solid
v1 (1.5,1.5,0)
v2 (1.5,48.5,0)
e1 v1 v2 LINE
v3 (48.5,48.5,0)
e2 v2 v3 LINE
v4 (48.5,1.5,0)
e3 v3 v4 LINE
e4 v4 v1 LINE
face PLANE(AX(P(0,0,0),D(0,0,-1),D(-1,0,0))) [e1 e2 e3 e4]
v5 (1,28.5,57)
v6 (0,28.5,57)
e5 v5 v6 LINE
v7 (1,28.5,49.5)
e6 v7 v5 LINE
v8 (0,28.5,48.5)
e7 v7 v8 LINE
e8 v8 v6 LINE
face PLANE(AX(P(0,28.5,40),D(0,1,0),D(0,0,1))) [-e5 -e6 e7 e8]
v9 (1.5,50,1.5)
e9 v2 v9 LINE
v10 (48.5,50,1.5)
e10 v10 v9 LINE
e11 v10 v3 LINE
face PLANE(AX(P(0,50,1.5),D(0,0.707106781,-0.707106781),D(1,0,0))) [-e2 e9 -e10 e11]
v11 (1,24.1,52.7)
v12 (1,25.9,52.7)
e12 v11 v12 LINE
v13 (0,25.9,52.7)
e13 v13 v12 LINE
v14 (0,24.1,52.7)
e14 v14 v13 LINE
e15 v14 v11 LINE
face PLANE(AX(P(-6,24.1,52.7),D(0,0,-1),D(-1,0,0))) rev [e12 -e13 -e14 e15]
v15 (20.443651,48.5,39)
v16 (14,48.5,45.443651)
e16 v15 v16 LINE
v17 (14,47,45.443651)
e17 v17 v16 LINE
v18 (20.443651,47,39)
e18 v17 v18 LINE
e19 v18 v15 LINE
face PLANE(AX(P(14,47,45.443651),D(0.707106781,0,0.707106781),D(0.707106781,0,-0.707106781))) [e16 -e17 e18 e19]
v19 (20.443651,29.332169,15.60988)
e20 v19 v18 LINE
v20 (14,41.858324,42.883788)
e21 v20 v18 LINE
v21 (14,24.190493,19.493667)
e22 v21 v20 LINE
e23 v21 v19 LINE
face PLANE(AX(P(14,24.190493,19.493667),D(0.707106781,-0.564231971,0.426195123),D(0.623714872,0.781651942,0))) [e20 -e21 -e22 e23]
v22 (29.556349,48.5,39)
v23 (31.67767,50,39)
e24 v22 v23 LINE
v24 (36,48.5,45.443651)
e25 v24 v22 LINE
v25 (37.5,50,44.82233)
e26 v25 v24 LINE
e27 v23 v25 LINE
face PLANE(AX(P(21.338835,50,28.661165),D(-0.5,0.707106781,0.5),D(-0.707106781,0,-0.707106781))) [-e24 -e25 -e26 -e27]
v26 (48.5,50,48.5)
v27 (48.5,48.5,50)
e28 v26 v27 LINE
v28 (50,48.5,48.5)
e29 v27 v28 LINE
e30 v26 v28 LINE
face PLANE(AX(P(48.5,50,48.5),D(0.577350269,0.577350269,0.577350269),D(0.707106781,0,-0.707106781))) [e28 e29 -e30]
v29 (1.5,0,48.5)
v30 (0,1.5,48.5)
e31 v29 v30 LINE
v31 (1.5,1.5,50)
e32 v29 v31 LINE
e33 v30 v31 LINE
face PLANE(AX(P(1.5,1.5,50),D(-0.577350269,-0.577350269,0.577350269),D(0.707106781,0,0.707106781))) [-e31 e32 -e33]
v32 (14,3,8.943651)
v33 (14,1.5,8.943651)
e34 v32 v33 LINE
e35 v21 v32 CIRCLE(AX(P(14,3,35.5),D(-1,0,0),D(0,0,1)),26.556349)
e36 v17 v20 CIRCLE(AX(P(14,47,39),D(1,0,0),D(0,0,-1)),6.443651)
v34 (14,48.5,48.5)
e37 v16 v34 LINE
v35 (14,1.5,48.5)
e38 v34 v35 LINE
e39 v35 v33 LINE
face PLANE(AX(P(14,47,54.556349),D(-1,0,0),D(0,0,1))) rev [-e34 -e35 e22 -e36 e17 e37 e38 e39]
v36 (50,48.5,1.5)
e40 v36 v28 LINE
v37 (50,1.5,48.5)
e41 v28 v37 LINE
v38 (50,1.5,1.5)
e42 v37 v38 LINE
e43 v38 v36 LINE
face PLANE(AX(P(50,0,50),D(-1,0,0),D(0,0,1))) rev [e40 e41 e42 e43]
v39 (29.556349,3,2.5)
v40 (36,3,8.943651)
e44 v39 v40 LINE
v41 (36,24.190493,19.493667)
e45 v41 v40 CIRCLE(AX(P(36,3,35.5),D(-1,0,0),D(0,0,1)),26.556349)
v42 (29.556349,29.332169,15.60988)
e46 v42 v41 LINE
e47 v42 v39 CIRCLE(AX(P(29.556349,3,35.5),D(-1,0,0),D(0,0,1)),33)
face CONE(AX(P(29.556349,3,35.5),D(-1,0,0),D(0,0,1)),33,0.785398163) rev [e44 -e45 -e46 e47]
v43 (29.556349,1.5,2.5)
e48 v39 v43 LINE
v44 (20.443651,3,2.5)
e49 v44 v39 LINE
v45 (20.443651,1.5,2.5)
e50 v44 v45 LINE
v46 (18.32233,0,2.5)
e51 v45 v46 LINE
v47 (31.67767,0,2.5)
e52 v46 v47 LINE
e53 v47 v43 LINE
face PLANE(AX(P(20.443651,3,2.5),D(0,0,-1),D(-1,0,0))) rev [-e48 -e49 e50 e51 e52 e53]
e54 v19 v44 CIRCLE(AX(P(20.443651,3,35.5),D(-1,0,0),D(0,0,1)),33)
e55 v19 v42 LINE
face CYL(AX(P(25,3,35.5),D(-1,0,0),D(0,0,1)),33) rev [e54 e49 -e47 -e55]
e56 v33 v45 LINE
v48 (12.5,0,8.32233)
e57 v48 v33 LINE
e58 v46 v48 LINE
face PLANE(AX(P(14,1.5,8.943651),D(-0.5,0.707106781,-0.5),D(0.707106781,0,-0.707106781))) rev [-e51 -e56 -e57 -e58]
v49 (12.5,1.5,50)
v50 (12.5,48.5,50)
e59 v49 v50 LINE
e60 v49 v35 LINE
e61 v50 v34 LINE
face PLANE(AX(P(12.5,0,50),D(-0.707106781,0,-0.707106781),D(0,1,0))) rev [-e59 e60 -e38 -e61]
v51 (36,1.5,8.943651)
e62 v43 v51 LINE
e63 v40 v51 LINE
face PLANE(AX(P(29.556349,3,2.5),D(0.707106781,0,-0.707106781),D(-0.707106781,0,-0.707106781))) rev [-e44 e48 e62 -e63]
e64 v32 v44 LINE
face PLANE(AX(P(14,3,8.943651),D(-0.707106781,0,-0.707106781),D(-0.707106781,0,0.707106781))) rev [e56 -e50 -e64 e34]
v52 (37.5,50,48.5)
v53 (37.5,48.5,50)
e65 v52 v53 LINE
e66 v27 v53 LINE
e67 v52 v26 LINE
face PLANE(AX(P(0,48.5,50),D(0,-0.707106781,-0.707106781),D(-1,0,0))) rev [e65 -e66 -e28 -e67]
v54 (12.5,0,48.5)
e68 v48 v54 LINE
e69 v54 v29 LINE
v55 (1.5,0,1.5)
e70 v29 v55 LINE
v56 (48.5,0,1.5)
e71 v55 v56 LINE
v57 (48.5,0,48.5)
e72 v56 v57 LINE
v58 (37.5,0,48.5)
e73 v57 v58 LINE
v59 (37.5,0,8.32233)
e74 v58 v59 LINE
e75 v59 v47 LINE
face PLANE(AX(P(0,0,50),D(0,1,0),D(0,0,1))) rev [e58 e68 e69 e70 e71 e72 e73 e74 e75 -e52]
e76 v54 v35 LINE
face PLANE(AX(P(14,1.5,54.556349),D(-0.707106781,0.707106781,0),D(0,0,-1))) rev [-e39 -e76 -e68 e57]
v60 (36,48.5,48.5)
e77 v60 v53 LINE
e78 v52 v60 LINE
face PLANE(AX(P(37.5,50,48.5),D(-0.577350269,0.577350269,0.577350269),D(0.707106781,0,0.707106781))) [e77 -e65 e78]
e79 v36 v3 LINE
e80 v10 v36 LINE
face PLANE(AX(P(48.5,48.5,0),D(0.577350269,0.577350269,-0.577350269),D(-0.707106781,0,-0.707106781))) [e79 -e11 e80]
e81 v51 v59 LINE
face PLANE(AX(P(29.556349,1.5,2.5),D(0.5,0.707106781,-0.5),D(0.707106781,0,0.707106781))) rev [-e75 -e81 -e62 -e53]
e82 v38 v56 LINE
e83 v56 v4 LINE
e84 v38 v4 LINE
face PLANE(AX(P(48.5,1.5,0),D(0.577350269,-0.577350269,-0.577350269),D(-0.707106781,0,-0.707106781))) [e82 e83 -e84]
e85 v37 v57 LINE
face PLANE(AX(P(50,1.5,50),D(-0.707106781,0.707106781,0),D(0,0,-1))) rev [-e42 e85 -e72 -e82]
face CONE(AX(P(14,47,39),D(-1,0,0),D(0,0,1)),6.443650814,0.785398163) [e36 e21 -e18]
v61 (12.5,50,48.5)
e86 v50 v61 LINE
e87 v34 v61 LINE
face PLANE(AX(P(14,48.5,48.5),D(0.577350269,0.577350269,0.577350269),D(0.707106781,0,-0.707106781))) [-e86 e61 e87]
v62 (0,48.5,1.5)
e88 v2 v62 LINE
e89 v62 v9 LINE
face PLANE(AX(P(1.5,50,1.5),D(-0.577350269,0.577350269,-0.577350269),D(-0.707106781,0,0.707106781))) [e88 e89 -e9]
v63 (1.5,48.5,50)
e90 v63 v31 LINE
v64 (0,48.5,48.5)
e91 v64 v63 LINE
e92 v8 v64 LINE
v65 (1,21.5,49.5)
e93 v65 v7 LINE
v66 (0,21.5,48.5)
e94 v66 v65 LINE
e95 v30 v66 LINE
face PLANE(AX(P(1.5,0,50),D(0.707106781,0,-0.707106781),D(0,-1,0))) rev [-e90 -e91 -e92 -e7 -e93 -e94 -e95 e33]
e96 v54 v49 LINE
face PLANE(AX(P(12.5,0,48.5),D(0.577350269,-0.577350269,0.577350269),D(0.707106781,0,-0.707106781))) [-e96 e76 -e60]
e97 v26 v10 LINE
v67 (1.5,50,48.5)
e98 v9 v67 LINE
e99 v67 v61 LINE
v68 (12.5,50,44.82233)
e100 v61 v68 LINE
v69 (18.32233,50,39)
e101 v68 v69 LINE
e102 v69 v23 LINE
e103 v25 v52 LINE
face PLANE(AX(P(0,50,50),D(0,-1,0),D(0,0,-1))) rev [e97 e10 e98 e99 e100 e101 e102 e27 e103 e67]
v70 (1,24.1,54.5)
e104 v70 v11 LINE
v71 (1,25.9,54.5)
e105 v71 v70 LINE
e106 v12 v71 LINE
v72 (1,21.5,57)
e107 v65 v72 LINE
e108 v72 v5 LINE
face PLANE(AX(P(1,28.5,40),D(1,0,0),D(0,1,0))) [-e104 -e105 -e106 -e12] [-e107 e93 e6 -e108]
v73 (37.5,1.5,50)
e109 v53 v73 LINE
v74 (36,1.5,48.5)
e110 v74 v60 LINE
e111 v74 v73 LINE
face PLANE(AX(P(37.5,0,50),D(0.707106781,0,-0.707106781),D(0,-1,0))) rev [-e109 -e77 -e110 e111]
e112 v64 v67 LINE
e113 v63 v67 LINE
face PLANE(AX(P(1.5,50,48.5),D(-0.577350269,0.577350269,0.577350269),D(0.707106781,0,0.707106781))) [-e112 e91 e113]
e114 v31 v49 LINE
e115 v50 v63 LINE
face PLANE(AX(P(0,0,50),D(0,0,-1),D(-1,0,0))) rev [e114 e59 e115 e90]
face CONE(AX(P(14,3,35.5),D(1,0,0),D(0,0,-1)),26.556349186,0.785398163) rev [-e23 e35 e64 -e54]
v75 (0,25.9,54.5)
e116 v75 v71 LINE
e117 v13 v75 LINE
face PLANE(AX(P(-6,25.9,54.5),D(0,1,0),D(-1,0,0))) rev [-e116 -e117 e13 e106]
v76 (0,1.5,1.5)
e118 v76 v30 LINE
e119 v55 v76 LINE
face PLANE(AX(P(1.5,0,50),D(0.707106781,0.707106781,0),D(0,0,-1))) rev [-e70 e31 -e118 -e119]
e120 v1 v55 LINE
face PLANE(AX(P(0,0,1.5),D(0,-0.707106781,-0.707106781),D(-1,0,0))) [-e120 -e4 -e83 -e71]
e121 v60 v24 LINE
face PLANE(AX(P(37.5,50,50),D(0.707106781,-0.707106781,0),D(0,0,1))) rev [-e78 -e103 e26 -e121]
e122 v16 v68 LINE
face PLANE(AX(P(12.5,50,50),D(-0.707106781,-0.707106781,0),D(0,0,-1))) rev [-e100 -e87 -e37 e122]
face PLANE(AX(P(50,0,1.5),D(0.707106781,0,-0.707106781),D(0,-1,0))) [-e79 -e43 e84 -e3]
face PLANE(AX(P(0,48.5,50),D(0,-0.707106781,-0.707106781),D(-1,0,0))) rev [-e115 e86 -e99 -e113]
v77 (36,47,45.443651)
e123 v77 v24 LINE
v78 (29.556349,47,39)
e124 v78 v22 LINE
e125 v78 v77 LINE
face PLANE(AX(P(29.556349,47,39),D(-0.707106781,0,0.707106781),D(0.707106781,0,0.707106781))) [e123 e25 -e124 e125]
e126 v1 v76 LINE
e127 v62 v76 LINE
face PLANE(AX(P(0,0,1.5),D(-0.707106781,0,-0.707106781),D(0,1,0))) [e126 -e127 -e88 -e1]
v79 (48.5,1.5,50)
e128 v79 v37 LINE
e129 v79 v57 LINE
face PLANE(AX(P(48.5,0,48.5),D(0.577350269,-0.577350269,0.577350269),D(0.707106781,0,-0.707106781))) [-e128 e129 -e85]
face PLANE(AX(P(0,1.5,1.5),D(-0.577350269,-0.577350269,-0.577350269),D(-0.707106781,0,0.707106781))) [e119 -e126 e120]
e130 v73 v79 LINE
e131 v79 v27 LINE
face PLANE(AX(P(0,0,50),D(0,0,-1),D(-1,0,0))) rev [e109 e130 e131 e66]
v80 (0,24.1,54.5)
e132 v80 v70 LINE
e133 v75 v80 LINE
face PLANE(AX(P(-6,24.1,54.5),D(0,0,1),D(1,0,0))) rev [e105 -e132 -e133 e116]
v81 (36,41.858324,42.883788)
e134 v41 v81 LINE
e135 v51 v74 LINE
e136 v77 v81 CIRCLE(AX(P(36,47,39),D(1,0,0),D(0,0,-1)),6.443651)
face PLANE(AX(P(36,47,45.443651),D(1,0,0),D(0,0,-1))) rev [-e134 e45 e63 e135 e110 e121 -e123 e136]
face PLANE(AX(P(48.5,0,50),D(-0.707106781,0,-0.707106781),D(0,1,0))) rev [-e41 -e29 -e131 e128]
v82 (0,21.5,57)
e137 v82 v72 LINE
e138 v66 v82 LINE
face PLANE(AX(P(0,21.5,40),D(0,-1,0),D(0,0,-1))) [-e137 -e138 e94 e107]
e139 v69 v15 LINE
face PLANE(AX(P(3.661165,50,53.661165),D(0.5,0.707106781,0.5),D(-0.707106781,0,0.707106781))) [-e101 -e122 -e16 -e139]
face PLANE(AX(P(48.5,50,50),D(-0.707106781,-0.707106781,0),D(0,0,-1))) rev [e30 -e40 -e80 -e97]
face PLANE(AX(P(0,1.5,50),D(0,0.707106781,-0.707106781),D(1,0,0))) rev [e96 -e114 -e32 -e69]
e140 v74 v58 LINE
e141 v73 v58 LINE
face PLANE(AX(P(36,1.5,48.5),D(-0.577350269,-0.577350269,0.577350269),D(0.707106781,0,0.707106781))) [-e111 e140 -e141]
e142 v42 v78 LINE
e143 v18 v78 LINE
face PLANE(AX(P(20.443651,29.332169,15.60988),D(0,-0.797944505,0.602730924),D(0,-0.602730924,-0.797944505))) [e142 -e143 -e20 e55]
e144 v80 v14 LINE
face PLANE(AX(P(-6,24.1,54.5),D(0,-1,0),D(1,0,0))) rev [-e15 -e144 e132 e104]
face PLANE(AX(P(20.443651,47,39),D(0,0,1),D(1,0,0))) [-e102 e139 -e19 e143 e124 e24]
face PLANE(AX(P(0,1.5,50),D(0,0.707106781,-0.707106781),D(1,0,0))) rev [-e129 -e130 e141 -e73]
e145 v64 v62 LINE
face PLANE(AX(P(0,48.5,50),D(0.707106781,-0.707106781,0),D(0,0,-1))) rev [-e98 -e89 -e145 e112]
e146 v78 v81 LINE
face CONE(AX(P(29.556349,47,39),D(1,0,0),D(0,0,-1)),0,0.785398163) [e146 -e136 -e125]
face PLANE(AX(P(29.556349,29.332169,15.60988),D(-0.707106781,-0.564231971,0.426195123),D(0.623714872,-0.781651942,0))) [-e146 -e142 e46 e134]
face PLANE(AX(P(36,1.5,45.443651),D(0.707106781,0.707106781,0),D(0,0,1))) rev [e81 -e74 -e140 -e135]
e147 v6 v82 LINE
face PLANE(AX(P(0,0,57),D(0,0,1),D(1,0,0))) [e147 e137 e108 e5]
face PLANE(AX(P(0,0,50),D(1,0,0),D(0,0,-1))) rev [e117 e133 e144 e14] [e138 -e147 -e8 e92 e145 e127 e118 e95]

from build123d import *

# Parameters (mm, degrees)
SKETCH1_W                = 50
SKETCH1_H                = 50
BOSS_EXTRUDE1_DEPTH      = 50
CUT_SWEEP3_START         = 47
CUT_SWEEP3_DEPTH         = 3
CUT_SWEEP3_2_ANGLE       = 52.934263
SKETCH12_W               = 22
SKETCH12_H               = 36
CUT_EXTRUDE6_DEPTH       = 11
SKETCH13_W               = 22
SKETCH13_H               = 20.943650814
CUT_EXTRUDE7_DEPTH       = 20
SKETCH14_W               = 22
SKETCH14_H               = 7.504472325
CUT_EXTRUDE8_DEPTH       = 12
CHAMFER1_SIZE            = 1.5
BOSS_EXTRUDE2_DEPTH      = 7
BOSS_EXTRUDE2_DEPTH_BACK = 10
SKETCH15_W               = 1
SKETCH15_H               = 7
SKETCH16_W               = 1.8
SKETCH16_H               = 1.8
CUT_EXTRUDE9_DEPTH       = 7


with BuildPart() as part:
    # Sketch1 → Boss-Extrude1 (new body)
    with BuildSketch(Plane.XY):
        with Locations((25, 25)):
            Rectangle(SKETCH1_W, SKETCH1_H)
    extrude(amount=BOSS_EXTRUDE1_DEPTH)

    # Cut-Sweep3: read off the stored shape, not the designer's step
    # Cut-Sweep3 outline → Cut-Sweep3 (cut)
    with BuildSketch(Plane(origin=(0, 0, 0), x_dir=(1, 0, 0), z_dir=(0, 1, 0)).offset(CUT_SWEEP3_START)):
        Polygon((20.443650814, -39), (14, -45.443650814), (14, -50), (36, -50), (36, -45.443650814), (29.556349186, -39), align=None)
    extrude(amount=CUT_SWEEP3_DEPTH, mode=Mode.SUBTRACT)

    # Cut-Sweep3 2 outline → Cut-Sweep3 2 (revolve, cut)
    with BuildSketch(Plane(origin=(0, 47, 39), x_dir=(0, 0, 1), z_dir=(0, 1, 0))):
        Polygon((6.443650814, 14), (15.556349186, 14), (18.250266522, 16.693917336), (18.250266522, 33.306082664), (15.556349091, 36.000000095), (6.443650814, 36), (0, 29.556349186), (0, 20.443650814), align=None)
    revolve(axis=Axis((0, 47, 39), (1, 0, 0)), revolution_arc=CUT_SWEEP3_2_ANGLE, mode=Mode.SUBTRACT)

    # Cut-Sweep4: sweep along a path in Sketch9
    with BuildLine(Plane(origin=(25, 0, 0), x_dir=(0, 0, -1), z_dir=(1, 0, 0))) as cut_sweep4_path:
        Line((-13.5, 0), (-13.5, 3))
        ThreePointArc((-13.5, 3), (-15.805815997, 12.805055658), (-22.239919677, 20.554779117))
        Line((-22.239919677, 20.554779117), (-45.630040161, 38.222610442))
    # Sketch5<2> → Cut-Sweep4 (sweep, cut)
    with BuildSketch(Plane(origin=(25, 38.222610442, 45.630040161), x_dir=(-1, 0, 0), z_dir=(0, -0.6027309237648077, -0.7979445052994735))):
        Polygon((4.556349186, 11), (-4.556349186, 11), (-11, 4.556349186), (-11, -4.556349186), (-4.556349186, -11), (4.556349186, -11), (11, -4.556349186), (11, 4.556349186), align=None)
    sweep(path=cut_sweep4_path.line, mode=Mode.SUBTRACT)

    # Sketch12 → Cut-Extrude6 (cut)
    with BuildSketch(Plane.XY.offset(50)):
        with Locations((25, 18)):
            Rectangle(SKETCH12_W, SKETCH12_H)
    extrude(amount=-CUT_EXTRUDE6_DEPTH, mode=Mode.SUBTRACT)

    # Sketch13 → Cut-Extrude7 (cut)
    with BuildSketch(Plane.XZ):
        with Locations((25, 28.528174593)):
            Rectangle(SKETCH13_W, SKETCH13_H)
    extrude(amount=-CUT_EXTRUDE7_DEPTH, mode=Mode.SUBTRACT)

    # Sketch14 → Cut-Extrude8 (cut)
    with BuildSketch(Plane.XY.offset(39)):
        with Locations((25, 23.752236163)):
            Rectangle(SKETCH14_W, SKETCH14_H)
    extrude(amount=-CUT_EXTRUDE8_DEPTH, mode=Mode.SUBTRACT)

    # Chamfer1
    chamfer1_edges = [part.edges().sort_by_distance(p)[0] for p in [
        (50, 25, 50),
        (43, 0, 50),
        (43, 50, 50),
        (7, 50, 50),
        (14, 25, 50),
        (36, 18, 50),
        (14, 50, 47.721825407),
        (36, 50, 47.721825407),
        (32.778174593, 50, 42.221825407),
        (17.221825407, 50, 42.221825407),
        (0, 25, 50),
        (25, 50, 0),
        (50, 25, 0),
        (25, 0, 0),
        (0, 25, 0),
        (17.221825407, 0, 5.721825407),
        (32.778174593, 0, 5.721825407),
        (36, 0, 29.471825407),
        (14, 0, 29.471825407),
        (7, 0, 50),
        (0, 50, 25),
        (50, 50, 25),
        (50, 0, 25),
        (0, 0, 25),
    ]]
    chamfer(chamfer1_edges, length=CHAMFER1_SIZE)

    # Sketch15 → Boss-Extrude2 (add, two sides: drawn at the far end of the back side and taken through both)
    with BuildSketch(Plane.XY.offset(50).offset(-BOSS_EXTRUDE2_DEPTH_BACK)):
        with Locations((0.5, 25)):
            Rectangle(SKETCH15_W, SKETCH15_H)
    extrude(amount=BOSS_EXTRUDE2_DEPTH + BOSS_EXTRUDE2_DEPTH_BACK)

    # Sketch16 → Cut-Extrude9 (cut)
    with BuildSketch(Plane(origin=(1, 0, 0), x_dir=(0, 0, -1), z_dir=(1, 0, 0))):
        with Locations((-53.6, 25)):
            Rectangle(SKETCH16_W, SKETCH16_H)
    extrude(amount=-CUT_EXTRUDE9_DEPTH, mode=Mode.SUBTRACT)


solid = part.part
